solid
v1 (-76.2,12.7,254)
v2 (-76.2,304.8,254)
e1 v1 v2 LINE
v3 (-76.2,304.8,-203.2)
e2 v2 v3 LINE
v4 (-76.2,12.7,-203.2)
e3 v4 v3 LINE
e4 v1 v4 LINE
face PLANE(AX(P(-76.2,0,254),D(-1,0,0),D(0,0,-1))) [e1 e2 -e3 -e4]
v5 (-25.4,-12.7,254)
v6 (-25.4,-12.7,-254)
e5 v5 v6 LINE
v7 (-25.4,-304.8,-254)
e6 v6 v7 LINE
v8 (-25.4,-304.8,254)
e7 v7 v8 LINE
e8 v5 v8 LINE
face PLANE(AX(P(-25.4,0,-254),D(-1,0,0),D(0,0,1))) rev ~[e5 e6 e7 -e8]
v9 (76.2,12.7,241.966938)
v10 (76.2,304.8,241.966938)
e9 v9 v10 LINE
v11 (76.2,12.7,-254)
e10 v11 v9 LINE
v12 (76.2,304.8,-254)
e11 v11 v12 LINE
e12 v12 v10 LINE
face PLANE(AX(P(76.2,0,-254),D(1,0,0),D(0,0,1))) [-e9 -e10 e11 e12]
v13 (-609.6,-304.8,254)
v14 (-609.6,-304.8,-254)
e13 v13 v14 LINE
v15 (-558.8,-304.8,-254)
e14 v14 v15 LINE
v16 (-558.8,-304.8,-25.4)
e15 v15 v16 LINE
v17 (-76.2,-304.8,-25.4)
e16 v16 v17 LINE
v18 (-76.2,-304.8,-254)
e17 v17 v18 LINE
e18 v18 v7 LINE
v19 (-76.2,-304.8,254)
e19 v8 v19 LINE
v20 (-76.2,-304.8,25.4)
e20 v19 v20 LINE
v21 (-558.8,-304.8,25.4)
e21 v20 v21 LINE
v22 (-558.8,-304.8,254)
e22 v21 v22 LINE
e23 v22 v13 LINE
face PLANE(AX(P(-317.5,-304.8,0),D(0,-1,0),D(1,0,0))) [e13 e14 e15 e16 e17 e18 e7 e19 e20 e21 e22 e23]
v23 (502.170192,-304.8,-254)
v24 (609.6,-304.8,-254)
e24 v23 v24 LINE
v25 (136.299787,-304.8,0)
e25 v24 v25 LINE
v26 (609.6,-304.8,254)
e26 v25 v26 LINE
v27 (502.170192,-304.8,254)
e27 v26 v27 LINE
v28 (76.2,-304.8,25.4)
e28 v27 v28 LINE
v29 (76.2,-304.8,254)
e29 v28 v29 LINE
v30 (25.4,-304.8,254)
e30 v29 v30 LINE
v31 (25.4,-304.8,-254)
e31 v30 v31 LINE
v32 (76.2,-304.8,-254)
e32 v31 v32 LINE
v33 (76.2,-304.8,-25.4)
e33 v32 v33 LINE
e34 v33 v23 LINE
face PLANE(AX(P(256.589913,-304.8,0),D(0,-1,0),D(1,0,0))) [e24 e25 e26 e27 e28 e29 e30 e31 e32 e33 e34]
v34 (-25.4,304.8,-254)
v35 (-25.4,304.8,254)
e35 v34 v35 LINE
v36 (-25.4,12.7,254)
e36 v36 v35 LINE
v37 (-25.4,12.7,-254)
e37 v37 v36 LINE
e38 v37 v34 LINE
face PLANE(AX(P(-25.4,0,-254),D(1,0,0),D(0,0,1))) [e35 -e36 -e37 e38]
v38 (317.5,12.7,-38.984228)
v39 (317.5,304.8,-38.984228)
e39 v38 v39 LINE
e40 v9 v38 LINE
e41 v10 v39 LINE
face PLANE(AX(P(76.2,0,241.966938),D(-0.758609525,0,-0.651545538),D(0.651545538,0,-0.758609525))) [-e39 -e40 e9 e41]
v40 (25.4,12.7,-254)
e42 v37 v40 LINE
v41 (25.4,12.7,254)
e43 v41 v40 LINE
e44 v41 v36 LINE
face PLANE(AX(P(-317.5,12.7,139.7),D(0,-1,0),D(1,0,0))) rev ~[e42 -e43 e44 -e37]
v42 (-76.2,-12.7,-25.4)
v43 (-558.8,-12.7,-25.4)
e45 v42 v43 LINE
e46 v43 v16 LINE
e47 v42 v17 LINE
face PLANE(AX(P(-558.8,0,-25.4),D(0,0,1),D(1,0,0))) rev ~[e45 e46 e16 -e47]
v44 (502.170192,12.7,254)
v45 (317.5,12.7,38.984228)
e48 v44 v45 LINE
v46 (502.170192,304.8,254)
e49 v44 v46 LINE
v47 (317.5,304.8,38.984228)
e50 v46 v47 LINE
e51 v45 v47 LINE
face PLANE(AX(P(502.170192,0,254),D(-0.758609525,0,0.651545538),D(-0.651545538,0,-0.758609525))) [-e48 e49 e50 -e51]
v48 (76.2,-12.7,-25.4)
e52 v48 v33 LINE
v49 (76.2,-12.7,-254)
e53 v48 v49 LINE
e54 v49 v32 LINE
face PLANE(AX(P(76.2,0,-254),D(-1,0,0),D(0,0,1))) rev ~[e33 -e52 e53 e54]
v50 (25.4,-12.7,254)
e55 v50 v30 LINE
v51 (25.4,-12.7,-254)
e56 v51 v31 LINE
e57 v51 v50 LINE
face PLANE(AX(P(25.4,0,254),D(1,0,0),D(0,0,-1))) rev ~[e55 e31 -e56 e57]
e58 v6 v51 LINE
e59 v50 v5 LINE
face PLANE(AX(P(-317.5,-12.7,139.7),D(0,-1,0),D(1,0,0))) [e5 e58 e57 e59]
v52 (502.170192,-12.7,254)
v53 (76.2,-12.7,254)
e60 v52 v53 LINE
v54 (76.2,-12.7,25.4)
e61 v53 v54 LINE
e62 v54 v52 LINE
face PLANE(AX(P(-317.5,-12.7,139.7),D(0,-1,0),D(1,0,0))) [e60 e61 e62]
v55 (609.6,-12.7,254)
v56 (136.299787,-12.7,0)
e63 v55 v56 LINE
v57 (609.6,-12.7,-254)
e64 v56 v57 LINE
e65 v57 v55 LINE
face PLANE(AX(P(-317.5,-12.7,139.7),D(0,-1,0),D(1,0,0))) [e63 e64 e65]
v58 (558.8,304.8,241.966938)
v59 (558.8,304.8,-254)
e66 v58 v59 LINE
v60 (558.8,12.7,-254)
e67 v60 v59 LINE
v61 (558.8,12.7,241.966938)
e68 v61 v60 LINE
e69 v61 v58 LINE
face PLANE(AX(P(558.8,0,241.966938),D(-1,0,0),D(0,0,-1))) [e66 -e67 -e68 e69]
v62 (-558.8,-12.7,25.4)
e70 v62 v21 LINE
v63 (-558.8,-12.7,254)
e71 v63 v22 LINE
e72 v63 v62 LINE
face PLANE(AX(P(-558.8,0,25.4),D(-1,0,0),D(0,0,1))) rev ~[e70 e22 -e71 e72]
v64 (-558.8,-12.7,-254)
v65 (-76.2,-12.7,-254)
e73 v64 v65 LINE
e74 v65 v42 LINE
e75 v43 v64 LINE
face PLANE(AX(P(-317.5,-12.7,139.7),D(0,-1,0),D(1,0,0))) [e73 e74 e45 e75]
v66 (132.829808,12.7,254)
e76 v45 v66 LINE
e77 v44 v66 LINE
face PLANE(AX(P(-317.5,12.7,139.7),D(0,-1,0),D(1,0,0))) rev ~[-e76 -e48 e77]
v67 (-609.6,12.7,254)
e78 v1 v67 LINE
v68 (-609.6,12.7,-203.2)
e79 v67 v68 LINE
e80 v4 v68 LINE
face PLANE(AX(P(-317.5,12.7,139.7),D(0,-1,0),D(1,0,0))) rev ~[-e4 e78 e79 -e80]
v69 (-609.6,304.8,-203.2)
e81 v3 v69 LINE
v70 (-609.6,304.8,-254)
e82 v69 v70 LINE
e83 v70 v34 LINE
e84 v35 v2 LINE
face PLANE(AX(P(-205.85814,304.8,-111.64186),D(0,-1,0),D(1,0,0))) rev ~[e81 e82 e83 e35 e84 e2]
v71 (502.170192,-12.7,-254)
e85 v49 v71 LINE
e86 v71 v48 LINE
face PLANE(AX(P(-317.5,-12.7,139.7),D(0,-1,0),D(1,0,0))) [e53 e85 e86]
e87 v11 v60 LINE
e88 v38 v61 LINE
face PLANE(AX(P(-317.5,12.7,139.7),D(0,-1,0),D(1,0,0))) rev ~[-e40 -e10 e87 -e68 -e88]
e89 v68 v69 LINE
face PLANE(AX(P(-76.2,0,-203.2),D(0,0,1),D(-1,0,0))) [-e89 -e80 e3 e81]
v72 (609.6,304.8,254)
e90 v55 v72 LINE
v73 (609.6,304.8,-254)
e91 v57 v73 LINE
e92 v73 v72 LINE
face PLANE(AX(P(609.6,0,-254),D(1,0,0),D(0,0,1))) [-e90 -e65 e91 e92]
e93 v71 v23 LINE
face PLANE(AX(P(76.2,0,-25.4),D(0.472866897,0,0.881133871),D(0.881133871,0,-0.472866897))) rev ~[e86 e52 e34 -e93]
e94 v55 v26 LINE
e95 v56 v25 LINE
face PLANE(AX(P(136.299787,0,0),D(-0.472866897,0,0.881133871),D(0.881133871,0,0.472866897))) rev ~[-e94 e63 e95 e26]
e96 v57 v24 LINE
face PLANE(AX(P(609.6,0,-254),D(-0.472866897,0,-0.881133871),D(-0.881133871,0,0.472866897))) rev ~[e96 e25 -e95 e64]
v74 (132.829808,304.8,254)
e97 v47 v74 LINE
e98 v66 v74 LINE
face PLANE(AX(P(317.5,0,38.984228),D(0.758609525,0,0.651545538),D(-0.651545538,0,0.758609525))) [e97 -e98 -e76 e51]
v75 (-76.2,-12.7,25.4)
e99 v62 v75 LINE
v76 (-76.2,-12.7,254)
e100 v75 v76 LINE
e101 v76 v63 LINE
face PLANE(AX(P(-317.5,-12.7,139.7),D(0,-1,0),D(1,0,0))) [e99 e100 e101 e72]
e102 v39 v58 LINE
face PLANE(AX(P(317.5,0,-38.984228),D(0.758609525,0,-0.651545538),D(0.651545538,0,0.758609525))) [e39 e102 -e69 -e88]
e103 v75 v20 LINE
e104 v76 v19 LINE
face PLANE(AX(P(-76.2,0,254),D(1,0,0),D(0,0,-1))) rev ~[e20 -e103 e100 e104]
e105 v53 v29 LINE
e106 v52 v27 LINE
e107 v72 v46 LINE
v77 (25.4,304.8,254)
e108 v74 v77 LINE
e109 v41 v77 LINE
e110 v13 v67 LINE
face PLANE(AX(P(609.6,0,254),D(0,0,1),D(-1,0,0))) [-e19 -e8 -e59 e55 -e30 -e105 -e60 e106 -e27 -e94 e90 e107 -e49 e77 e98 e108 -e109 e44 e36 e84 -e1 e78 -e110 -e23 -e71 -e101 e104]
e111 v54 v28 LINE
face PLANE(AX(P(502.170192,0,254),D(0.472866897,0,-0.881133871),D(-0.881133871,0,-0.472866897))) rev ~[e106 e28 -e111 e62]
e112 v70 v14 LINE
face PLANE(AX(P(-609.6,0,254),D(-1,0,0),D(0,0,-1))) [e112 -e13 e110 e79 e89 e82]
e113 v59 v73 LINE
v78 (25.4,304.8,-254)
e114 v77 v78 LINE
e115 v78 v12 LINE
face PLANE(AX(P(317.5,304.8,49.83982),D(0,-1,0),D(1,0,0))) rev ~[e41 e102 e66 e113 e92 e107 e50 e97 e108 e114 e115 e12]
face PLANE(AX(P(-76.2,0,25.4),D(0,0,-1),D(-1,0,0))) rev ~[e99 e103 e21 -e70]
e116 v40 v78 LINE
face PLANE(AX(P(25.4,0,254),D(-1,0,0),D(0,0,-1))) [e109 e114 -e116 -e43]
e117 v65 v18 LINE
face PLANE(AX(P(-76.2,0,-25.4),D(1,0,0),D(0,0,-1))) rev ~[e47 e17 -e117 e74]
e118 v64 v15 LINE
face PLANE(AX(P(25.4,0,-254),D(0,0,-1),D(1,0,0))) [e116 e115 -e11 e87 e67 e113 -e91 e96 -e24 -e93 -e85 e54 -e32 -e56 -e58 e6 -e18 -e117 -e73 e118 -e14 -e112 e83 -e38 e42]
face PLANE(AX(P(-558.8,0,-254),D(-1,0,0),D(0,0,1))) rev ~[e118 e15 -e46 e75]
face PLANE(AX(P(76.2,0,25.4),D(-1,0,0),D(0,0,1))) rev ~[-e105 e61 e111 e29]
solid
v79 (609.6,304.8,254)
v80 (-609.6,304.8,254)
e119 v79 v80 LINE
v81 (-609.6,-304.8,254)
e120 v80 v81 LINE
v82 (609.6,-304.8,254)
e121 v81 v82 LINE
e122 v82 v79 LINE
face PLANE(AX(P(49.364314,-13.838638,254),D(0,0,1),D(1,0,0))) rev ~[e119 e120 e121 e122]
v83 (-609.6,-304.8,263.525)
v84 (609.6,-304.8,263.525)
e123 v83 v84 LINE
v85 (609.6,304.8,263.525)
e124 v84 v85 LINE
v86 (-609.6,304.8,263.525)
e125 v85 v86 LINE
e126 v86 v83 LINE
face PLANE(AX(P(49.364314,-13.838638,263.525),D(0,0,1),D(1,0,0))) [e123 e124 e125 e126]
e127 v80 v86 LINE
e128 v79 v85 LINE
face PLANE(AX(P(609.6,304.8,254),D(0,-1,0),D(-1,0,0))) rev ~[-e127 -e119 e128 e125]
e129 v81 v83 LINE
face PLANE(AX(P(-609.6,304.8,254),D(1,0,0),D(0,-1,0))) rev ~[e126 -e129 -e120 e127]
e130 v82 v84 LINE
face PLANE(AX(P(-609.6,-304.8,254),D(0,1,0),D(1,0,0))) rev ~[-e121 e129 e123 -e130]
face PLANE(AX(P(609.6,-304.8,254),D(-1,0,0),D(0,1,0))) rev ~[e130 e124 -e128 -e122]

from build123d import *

# Parameters (mm, degrees)
F0_W     = 482.6
F0_H     = 228.6
F0_W_2   = 50.8
F0_H_2   = 508
F1_DEPTH = 12.7
F2_DEPTH = 304.8
F4_DEPTH = 304.8
F5_W     = 369.3403837607
F5_H     = 292.1
F5_W_2   = 50.8
F5_W_3   = 425.9701918804
F5_W_4   = 533.4
F5_W_5   = 482.6
F6_DEPTH = 9.525


# Not quite as in the source:
# - a length typed as a fraction of an inch, garbled in the dataset ("3 / 203.2 mm" for 3/8 in), is restored


with BuildPart() as f1:
    # F0 (on Front) → F1 (new body, symmetric)
    with BuildSketch(Plane.XZ):
        with Locations((-317.5, 139.7)):
            Rectangle(F0_W, F0_H)
        with Locations((-317.5, -139.7)):
            Rectangle(F0_W, F0_H)
        Polygon((-558.8, 254), (-609.6, 254), (-609.6, -254), (-558.8, -254), (-558.8, -25.4), (-76.2, -25.4), (-76.2, -254), (-25.4, -254), (-25.4, 254), (-76.2, 254), (-76.2, 25.4), (-558.8, 25.4), align=None)
        Rectangle(F0_W_2, F0_H_2)
        Polygon((76.2, 254), (25.4, 254), (25.4, -254), (76.2, -254), (76.2, -25.4), (502.1701918804, -254), (609.6, -254), (136.2997867996, 0), (609.6, 254), (502.1701918804, 254), (76.2, 25.4), align=None)
        Polygon((76.2, -25.4), (76.2, -254), (502.1701918804, -254), align=None)
        Polygon((609.6, -254), (609.6, 254), (136.2997867996, 0), align=None)
        Polygon((502.1701918804, 254), (76.2, 254), (76.2, 25.4), align=None)
    extrude(amount=F1_DEPTH, both=True)

    # F0 (on Front) → F2 (join)
    with BuildSketch(Plane.XZ):
        Polygon((-558.8, 254), (-609.6, 254), (-609.6, -254), (-558.8, -254), (-558.8, -25.4), (-76.2, -25.4), (-76.2, -254), (-25.4, -254), (-25.4, 254), (-76.2, 254), (-76.2, 25.4), (-558.8, 25.4), align=None)
        Polygon((76.2, 254), (25.4, 254), (25.4, -254), (76.2, -254), (76.2, -25.4), (502.1701918804, -254), (609.6, -254), (136.2997867996, 0), (609.6, 254), (502.1701918804, 254), (76.2, 25.4), align=None)
    extrude(amount=F2_DEPTH)

    # F3 (on Front) → F4 (join)
    with BuildSketch(Plane.XZ):
        Polygon((132.8298081196, 254), (25.4, 254), (25.4, -254), (76.2, -254), (76.2, 241.9669375636), (317.5, -38.9842283051), (558.8, 241.9669375636), (558.8, -254), (609.6, -254), (609.6, 254), (502.1701918804, 254), (317.5, 38.9842283051), align=None)
        Polygon((-25.4, -254), (-25.4, 254), (-76.2, 254), (-76.2, -203.2), (-609.6, -203.2), (-609.6, -254), align=None)
    extrude(amount=-F4_DEPTH)


with BuildPart() as f6:
    # F5 (on face) → F6 (new body)
    with BuildSketch(Plane.XY.offset(254)):
        Polygon((609.6, -12.7), (609.6, 304.8), (502.1701918804, 304.8), (502.1701918804, 12.7), (132.8298081196, 12.7), (132.8298081196, 304.8), (25.4, 304.8), (25.4, 12.7), (-25.4, 12.7), (-25.4, 304.8), (-76.2, 304.8), (-76.2, 12.7), (-609.6, 12.7), (-609.6, -304.8), (-558.8, -304.8), (-558.8, -12.7), (-76.2, -12.7), (-76.2, -304.8), (-25.4, -304.8), (-25.4, -12.7), (25.4, -12.7), (25.4, -304.8), (76.2, -304.8), (76.2, -12.7), (502.1701918804, -12.7), (502.1701918804, -304.8), (609.6, -304.8), align=None)
        with Locations((317.5, 158.75)):
            Rectangle(F5_W, F5_H)
        with Locations((0, 158.75)):
            Rectangle(F5_W_2, F5_H)
        with Locations((289.1850959402, -158.75)):
            Rectangle(F5_W_3, F5_H)
        with Locations((-342.9, 158.75)):
            Rectangle(F5_W_4, F5_H)
        with Locations((0, -158.75)):
            Rectangle(F5_W_2, F5_H)
        with Locations((-317.5, -158.75)):
            Rectangle(F5_W_5, F5_H)
    extrude(amount=F6_DEPTH)


solid = Compound([f1.part, f6.part])
